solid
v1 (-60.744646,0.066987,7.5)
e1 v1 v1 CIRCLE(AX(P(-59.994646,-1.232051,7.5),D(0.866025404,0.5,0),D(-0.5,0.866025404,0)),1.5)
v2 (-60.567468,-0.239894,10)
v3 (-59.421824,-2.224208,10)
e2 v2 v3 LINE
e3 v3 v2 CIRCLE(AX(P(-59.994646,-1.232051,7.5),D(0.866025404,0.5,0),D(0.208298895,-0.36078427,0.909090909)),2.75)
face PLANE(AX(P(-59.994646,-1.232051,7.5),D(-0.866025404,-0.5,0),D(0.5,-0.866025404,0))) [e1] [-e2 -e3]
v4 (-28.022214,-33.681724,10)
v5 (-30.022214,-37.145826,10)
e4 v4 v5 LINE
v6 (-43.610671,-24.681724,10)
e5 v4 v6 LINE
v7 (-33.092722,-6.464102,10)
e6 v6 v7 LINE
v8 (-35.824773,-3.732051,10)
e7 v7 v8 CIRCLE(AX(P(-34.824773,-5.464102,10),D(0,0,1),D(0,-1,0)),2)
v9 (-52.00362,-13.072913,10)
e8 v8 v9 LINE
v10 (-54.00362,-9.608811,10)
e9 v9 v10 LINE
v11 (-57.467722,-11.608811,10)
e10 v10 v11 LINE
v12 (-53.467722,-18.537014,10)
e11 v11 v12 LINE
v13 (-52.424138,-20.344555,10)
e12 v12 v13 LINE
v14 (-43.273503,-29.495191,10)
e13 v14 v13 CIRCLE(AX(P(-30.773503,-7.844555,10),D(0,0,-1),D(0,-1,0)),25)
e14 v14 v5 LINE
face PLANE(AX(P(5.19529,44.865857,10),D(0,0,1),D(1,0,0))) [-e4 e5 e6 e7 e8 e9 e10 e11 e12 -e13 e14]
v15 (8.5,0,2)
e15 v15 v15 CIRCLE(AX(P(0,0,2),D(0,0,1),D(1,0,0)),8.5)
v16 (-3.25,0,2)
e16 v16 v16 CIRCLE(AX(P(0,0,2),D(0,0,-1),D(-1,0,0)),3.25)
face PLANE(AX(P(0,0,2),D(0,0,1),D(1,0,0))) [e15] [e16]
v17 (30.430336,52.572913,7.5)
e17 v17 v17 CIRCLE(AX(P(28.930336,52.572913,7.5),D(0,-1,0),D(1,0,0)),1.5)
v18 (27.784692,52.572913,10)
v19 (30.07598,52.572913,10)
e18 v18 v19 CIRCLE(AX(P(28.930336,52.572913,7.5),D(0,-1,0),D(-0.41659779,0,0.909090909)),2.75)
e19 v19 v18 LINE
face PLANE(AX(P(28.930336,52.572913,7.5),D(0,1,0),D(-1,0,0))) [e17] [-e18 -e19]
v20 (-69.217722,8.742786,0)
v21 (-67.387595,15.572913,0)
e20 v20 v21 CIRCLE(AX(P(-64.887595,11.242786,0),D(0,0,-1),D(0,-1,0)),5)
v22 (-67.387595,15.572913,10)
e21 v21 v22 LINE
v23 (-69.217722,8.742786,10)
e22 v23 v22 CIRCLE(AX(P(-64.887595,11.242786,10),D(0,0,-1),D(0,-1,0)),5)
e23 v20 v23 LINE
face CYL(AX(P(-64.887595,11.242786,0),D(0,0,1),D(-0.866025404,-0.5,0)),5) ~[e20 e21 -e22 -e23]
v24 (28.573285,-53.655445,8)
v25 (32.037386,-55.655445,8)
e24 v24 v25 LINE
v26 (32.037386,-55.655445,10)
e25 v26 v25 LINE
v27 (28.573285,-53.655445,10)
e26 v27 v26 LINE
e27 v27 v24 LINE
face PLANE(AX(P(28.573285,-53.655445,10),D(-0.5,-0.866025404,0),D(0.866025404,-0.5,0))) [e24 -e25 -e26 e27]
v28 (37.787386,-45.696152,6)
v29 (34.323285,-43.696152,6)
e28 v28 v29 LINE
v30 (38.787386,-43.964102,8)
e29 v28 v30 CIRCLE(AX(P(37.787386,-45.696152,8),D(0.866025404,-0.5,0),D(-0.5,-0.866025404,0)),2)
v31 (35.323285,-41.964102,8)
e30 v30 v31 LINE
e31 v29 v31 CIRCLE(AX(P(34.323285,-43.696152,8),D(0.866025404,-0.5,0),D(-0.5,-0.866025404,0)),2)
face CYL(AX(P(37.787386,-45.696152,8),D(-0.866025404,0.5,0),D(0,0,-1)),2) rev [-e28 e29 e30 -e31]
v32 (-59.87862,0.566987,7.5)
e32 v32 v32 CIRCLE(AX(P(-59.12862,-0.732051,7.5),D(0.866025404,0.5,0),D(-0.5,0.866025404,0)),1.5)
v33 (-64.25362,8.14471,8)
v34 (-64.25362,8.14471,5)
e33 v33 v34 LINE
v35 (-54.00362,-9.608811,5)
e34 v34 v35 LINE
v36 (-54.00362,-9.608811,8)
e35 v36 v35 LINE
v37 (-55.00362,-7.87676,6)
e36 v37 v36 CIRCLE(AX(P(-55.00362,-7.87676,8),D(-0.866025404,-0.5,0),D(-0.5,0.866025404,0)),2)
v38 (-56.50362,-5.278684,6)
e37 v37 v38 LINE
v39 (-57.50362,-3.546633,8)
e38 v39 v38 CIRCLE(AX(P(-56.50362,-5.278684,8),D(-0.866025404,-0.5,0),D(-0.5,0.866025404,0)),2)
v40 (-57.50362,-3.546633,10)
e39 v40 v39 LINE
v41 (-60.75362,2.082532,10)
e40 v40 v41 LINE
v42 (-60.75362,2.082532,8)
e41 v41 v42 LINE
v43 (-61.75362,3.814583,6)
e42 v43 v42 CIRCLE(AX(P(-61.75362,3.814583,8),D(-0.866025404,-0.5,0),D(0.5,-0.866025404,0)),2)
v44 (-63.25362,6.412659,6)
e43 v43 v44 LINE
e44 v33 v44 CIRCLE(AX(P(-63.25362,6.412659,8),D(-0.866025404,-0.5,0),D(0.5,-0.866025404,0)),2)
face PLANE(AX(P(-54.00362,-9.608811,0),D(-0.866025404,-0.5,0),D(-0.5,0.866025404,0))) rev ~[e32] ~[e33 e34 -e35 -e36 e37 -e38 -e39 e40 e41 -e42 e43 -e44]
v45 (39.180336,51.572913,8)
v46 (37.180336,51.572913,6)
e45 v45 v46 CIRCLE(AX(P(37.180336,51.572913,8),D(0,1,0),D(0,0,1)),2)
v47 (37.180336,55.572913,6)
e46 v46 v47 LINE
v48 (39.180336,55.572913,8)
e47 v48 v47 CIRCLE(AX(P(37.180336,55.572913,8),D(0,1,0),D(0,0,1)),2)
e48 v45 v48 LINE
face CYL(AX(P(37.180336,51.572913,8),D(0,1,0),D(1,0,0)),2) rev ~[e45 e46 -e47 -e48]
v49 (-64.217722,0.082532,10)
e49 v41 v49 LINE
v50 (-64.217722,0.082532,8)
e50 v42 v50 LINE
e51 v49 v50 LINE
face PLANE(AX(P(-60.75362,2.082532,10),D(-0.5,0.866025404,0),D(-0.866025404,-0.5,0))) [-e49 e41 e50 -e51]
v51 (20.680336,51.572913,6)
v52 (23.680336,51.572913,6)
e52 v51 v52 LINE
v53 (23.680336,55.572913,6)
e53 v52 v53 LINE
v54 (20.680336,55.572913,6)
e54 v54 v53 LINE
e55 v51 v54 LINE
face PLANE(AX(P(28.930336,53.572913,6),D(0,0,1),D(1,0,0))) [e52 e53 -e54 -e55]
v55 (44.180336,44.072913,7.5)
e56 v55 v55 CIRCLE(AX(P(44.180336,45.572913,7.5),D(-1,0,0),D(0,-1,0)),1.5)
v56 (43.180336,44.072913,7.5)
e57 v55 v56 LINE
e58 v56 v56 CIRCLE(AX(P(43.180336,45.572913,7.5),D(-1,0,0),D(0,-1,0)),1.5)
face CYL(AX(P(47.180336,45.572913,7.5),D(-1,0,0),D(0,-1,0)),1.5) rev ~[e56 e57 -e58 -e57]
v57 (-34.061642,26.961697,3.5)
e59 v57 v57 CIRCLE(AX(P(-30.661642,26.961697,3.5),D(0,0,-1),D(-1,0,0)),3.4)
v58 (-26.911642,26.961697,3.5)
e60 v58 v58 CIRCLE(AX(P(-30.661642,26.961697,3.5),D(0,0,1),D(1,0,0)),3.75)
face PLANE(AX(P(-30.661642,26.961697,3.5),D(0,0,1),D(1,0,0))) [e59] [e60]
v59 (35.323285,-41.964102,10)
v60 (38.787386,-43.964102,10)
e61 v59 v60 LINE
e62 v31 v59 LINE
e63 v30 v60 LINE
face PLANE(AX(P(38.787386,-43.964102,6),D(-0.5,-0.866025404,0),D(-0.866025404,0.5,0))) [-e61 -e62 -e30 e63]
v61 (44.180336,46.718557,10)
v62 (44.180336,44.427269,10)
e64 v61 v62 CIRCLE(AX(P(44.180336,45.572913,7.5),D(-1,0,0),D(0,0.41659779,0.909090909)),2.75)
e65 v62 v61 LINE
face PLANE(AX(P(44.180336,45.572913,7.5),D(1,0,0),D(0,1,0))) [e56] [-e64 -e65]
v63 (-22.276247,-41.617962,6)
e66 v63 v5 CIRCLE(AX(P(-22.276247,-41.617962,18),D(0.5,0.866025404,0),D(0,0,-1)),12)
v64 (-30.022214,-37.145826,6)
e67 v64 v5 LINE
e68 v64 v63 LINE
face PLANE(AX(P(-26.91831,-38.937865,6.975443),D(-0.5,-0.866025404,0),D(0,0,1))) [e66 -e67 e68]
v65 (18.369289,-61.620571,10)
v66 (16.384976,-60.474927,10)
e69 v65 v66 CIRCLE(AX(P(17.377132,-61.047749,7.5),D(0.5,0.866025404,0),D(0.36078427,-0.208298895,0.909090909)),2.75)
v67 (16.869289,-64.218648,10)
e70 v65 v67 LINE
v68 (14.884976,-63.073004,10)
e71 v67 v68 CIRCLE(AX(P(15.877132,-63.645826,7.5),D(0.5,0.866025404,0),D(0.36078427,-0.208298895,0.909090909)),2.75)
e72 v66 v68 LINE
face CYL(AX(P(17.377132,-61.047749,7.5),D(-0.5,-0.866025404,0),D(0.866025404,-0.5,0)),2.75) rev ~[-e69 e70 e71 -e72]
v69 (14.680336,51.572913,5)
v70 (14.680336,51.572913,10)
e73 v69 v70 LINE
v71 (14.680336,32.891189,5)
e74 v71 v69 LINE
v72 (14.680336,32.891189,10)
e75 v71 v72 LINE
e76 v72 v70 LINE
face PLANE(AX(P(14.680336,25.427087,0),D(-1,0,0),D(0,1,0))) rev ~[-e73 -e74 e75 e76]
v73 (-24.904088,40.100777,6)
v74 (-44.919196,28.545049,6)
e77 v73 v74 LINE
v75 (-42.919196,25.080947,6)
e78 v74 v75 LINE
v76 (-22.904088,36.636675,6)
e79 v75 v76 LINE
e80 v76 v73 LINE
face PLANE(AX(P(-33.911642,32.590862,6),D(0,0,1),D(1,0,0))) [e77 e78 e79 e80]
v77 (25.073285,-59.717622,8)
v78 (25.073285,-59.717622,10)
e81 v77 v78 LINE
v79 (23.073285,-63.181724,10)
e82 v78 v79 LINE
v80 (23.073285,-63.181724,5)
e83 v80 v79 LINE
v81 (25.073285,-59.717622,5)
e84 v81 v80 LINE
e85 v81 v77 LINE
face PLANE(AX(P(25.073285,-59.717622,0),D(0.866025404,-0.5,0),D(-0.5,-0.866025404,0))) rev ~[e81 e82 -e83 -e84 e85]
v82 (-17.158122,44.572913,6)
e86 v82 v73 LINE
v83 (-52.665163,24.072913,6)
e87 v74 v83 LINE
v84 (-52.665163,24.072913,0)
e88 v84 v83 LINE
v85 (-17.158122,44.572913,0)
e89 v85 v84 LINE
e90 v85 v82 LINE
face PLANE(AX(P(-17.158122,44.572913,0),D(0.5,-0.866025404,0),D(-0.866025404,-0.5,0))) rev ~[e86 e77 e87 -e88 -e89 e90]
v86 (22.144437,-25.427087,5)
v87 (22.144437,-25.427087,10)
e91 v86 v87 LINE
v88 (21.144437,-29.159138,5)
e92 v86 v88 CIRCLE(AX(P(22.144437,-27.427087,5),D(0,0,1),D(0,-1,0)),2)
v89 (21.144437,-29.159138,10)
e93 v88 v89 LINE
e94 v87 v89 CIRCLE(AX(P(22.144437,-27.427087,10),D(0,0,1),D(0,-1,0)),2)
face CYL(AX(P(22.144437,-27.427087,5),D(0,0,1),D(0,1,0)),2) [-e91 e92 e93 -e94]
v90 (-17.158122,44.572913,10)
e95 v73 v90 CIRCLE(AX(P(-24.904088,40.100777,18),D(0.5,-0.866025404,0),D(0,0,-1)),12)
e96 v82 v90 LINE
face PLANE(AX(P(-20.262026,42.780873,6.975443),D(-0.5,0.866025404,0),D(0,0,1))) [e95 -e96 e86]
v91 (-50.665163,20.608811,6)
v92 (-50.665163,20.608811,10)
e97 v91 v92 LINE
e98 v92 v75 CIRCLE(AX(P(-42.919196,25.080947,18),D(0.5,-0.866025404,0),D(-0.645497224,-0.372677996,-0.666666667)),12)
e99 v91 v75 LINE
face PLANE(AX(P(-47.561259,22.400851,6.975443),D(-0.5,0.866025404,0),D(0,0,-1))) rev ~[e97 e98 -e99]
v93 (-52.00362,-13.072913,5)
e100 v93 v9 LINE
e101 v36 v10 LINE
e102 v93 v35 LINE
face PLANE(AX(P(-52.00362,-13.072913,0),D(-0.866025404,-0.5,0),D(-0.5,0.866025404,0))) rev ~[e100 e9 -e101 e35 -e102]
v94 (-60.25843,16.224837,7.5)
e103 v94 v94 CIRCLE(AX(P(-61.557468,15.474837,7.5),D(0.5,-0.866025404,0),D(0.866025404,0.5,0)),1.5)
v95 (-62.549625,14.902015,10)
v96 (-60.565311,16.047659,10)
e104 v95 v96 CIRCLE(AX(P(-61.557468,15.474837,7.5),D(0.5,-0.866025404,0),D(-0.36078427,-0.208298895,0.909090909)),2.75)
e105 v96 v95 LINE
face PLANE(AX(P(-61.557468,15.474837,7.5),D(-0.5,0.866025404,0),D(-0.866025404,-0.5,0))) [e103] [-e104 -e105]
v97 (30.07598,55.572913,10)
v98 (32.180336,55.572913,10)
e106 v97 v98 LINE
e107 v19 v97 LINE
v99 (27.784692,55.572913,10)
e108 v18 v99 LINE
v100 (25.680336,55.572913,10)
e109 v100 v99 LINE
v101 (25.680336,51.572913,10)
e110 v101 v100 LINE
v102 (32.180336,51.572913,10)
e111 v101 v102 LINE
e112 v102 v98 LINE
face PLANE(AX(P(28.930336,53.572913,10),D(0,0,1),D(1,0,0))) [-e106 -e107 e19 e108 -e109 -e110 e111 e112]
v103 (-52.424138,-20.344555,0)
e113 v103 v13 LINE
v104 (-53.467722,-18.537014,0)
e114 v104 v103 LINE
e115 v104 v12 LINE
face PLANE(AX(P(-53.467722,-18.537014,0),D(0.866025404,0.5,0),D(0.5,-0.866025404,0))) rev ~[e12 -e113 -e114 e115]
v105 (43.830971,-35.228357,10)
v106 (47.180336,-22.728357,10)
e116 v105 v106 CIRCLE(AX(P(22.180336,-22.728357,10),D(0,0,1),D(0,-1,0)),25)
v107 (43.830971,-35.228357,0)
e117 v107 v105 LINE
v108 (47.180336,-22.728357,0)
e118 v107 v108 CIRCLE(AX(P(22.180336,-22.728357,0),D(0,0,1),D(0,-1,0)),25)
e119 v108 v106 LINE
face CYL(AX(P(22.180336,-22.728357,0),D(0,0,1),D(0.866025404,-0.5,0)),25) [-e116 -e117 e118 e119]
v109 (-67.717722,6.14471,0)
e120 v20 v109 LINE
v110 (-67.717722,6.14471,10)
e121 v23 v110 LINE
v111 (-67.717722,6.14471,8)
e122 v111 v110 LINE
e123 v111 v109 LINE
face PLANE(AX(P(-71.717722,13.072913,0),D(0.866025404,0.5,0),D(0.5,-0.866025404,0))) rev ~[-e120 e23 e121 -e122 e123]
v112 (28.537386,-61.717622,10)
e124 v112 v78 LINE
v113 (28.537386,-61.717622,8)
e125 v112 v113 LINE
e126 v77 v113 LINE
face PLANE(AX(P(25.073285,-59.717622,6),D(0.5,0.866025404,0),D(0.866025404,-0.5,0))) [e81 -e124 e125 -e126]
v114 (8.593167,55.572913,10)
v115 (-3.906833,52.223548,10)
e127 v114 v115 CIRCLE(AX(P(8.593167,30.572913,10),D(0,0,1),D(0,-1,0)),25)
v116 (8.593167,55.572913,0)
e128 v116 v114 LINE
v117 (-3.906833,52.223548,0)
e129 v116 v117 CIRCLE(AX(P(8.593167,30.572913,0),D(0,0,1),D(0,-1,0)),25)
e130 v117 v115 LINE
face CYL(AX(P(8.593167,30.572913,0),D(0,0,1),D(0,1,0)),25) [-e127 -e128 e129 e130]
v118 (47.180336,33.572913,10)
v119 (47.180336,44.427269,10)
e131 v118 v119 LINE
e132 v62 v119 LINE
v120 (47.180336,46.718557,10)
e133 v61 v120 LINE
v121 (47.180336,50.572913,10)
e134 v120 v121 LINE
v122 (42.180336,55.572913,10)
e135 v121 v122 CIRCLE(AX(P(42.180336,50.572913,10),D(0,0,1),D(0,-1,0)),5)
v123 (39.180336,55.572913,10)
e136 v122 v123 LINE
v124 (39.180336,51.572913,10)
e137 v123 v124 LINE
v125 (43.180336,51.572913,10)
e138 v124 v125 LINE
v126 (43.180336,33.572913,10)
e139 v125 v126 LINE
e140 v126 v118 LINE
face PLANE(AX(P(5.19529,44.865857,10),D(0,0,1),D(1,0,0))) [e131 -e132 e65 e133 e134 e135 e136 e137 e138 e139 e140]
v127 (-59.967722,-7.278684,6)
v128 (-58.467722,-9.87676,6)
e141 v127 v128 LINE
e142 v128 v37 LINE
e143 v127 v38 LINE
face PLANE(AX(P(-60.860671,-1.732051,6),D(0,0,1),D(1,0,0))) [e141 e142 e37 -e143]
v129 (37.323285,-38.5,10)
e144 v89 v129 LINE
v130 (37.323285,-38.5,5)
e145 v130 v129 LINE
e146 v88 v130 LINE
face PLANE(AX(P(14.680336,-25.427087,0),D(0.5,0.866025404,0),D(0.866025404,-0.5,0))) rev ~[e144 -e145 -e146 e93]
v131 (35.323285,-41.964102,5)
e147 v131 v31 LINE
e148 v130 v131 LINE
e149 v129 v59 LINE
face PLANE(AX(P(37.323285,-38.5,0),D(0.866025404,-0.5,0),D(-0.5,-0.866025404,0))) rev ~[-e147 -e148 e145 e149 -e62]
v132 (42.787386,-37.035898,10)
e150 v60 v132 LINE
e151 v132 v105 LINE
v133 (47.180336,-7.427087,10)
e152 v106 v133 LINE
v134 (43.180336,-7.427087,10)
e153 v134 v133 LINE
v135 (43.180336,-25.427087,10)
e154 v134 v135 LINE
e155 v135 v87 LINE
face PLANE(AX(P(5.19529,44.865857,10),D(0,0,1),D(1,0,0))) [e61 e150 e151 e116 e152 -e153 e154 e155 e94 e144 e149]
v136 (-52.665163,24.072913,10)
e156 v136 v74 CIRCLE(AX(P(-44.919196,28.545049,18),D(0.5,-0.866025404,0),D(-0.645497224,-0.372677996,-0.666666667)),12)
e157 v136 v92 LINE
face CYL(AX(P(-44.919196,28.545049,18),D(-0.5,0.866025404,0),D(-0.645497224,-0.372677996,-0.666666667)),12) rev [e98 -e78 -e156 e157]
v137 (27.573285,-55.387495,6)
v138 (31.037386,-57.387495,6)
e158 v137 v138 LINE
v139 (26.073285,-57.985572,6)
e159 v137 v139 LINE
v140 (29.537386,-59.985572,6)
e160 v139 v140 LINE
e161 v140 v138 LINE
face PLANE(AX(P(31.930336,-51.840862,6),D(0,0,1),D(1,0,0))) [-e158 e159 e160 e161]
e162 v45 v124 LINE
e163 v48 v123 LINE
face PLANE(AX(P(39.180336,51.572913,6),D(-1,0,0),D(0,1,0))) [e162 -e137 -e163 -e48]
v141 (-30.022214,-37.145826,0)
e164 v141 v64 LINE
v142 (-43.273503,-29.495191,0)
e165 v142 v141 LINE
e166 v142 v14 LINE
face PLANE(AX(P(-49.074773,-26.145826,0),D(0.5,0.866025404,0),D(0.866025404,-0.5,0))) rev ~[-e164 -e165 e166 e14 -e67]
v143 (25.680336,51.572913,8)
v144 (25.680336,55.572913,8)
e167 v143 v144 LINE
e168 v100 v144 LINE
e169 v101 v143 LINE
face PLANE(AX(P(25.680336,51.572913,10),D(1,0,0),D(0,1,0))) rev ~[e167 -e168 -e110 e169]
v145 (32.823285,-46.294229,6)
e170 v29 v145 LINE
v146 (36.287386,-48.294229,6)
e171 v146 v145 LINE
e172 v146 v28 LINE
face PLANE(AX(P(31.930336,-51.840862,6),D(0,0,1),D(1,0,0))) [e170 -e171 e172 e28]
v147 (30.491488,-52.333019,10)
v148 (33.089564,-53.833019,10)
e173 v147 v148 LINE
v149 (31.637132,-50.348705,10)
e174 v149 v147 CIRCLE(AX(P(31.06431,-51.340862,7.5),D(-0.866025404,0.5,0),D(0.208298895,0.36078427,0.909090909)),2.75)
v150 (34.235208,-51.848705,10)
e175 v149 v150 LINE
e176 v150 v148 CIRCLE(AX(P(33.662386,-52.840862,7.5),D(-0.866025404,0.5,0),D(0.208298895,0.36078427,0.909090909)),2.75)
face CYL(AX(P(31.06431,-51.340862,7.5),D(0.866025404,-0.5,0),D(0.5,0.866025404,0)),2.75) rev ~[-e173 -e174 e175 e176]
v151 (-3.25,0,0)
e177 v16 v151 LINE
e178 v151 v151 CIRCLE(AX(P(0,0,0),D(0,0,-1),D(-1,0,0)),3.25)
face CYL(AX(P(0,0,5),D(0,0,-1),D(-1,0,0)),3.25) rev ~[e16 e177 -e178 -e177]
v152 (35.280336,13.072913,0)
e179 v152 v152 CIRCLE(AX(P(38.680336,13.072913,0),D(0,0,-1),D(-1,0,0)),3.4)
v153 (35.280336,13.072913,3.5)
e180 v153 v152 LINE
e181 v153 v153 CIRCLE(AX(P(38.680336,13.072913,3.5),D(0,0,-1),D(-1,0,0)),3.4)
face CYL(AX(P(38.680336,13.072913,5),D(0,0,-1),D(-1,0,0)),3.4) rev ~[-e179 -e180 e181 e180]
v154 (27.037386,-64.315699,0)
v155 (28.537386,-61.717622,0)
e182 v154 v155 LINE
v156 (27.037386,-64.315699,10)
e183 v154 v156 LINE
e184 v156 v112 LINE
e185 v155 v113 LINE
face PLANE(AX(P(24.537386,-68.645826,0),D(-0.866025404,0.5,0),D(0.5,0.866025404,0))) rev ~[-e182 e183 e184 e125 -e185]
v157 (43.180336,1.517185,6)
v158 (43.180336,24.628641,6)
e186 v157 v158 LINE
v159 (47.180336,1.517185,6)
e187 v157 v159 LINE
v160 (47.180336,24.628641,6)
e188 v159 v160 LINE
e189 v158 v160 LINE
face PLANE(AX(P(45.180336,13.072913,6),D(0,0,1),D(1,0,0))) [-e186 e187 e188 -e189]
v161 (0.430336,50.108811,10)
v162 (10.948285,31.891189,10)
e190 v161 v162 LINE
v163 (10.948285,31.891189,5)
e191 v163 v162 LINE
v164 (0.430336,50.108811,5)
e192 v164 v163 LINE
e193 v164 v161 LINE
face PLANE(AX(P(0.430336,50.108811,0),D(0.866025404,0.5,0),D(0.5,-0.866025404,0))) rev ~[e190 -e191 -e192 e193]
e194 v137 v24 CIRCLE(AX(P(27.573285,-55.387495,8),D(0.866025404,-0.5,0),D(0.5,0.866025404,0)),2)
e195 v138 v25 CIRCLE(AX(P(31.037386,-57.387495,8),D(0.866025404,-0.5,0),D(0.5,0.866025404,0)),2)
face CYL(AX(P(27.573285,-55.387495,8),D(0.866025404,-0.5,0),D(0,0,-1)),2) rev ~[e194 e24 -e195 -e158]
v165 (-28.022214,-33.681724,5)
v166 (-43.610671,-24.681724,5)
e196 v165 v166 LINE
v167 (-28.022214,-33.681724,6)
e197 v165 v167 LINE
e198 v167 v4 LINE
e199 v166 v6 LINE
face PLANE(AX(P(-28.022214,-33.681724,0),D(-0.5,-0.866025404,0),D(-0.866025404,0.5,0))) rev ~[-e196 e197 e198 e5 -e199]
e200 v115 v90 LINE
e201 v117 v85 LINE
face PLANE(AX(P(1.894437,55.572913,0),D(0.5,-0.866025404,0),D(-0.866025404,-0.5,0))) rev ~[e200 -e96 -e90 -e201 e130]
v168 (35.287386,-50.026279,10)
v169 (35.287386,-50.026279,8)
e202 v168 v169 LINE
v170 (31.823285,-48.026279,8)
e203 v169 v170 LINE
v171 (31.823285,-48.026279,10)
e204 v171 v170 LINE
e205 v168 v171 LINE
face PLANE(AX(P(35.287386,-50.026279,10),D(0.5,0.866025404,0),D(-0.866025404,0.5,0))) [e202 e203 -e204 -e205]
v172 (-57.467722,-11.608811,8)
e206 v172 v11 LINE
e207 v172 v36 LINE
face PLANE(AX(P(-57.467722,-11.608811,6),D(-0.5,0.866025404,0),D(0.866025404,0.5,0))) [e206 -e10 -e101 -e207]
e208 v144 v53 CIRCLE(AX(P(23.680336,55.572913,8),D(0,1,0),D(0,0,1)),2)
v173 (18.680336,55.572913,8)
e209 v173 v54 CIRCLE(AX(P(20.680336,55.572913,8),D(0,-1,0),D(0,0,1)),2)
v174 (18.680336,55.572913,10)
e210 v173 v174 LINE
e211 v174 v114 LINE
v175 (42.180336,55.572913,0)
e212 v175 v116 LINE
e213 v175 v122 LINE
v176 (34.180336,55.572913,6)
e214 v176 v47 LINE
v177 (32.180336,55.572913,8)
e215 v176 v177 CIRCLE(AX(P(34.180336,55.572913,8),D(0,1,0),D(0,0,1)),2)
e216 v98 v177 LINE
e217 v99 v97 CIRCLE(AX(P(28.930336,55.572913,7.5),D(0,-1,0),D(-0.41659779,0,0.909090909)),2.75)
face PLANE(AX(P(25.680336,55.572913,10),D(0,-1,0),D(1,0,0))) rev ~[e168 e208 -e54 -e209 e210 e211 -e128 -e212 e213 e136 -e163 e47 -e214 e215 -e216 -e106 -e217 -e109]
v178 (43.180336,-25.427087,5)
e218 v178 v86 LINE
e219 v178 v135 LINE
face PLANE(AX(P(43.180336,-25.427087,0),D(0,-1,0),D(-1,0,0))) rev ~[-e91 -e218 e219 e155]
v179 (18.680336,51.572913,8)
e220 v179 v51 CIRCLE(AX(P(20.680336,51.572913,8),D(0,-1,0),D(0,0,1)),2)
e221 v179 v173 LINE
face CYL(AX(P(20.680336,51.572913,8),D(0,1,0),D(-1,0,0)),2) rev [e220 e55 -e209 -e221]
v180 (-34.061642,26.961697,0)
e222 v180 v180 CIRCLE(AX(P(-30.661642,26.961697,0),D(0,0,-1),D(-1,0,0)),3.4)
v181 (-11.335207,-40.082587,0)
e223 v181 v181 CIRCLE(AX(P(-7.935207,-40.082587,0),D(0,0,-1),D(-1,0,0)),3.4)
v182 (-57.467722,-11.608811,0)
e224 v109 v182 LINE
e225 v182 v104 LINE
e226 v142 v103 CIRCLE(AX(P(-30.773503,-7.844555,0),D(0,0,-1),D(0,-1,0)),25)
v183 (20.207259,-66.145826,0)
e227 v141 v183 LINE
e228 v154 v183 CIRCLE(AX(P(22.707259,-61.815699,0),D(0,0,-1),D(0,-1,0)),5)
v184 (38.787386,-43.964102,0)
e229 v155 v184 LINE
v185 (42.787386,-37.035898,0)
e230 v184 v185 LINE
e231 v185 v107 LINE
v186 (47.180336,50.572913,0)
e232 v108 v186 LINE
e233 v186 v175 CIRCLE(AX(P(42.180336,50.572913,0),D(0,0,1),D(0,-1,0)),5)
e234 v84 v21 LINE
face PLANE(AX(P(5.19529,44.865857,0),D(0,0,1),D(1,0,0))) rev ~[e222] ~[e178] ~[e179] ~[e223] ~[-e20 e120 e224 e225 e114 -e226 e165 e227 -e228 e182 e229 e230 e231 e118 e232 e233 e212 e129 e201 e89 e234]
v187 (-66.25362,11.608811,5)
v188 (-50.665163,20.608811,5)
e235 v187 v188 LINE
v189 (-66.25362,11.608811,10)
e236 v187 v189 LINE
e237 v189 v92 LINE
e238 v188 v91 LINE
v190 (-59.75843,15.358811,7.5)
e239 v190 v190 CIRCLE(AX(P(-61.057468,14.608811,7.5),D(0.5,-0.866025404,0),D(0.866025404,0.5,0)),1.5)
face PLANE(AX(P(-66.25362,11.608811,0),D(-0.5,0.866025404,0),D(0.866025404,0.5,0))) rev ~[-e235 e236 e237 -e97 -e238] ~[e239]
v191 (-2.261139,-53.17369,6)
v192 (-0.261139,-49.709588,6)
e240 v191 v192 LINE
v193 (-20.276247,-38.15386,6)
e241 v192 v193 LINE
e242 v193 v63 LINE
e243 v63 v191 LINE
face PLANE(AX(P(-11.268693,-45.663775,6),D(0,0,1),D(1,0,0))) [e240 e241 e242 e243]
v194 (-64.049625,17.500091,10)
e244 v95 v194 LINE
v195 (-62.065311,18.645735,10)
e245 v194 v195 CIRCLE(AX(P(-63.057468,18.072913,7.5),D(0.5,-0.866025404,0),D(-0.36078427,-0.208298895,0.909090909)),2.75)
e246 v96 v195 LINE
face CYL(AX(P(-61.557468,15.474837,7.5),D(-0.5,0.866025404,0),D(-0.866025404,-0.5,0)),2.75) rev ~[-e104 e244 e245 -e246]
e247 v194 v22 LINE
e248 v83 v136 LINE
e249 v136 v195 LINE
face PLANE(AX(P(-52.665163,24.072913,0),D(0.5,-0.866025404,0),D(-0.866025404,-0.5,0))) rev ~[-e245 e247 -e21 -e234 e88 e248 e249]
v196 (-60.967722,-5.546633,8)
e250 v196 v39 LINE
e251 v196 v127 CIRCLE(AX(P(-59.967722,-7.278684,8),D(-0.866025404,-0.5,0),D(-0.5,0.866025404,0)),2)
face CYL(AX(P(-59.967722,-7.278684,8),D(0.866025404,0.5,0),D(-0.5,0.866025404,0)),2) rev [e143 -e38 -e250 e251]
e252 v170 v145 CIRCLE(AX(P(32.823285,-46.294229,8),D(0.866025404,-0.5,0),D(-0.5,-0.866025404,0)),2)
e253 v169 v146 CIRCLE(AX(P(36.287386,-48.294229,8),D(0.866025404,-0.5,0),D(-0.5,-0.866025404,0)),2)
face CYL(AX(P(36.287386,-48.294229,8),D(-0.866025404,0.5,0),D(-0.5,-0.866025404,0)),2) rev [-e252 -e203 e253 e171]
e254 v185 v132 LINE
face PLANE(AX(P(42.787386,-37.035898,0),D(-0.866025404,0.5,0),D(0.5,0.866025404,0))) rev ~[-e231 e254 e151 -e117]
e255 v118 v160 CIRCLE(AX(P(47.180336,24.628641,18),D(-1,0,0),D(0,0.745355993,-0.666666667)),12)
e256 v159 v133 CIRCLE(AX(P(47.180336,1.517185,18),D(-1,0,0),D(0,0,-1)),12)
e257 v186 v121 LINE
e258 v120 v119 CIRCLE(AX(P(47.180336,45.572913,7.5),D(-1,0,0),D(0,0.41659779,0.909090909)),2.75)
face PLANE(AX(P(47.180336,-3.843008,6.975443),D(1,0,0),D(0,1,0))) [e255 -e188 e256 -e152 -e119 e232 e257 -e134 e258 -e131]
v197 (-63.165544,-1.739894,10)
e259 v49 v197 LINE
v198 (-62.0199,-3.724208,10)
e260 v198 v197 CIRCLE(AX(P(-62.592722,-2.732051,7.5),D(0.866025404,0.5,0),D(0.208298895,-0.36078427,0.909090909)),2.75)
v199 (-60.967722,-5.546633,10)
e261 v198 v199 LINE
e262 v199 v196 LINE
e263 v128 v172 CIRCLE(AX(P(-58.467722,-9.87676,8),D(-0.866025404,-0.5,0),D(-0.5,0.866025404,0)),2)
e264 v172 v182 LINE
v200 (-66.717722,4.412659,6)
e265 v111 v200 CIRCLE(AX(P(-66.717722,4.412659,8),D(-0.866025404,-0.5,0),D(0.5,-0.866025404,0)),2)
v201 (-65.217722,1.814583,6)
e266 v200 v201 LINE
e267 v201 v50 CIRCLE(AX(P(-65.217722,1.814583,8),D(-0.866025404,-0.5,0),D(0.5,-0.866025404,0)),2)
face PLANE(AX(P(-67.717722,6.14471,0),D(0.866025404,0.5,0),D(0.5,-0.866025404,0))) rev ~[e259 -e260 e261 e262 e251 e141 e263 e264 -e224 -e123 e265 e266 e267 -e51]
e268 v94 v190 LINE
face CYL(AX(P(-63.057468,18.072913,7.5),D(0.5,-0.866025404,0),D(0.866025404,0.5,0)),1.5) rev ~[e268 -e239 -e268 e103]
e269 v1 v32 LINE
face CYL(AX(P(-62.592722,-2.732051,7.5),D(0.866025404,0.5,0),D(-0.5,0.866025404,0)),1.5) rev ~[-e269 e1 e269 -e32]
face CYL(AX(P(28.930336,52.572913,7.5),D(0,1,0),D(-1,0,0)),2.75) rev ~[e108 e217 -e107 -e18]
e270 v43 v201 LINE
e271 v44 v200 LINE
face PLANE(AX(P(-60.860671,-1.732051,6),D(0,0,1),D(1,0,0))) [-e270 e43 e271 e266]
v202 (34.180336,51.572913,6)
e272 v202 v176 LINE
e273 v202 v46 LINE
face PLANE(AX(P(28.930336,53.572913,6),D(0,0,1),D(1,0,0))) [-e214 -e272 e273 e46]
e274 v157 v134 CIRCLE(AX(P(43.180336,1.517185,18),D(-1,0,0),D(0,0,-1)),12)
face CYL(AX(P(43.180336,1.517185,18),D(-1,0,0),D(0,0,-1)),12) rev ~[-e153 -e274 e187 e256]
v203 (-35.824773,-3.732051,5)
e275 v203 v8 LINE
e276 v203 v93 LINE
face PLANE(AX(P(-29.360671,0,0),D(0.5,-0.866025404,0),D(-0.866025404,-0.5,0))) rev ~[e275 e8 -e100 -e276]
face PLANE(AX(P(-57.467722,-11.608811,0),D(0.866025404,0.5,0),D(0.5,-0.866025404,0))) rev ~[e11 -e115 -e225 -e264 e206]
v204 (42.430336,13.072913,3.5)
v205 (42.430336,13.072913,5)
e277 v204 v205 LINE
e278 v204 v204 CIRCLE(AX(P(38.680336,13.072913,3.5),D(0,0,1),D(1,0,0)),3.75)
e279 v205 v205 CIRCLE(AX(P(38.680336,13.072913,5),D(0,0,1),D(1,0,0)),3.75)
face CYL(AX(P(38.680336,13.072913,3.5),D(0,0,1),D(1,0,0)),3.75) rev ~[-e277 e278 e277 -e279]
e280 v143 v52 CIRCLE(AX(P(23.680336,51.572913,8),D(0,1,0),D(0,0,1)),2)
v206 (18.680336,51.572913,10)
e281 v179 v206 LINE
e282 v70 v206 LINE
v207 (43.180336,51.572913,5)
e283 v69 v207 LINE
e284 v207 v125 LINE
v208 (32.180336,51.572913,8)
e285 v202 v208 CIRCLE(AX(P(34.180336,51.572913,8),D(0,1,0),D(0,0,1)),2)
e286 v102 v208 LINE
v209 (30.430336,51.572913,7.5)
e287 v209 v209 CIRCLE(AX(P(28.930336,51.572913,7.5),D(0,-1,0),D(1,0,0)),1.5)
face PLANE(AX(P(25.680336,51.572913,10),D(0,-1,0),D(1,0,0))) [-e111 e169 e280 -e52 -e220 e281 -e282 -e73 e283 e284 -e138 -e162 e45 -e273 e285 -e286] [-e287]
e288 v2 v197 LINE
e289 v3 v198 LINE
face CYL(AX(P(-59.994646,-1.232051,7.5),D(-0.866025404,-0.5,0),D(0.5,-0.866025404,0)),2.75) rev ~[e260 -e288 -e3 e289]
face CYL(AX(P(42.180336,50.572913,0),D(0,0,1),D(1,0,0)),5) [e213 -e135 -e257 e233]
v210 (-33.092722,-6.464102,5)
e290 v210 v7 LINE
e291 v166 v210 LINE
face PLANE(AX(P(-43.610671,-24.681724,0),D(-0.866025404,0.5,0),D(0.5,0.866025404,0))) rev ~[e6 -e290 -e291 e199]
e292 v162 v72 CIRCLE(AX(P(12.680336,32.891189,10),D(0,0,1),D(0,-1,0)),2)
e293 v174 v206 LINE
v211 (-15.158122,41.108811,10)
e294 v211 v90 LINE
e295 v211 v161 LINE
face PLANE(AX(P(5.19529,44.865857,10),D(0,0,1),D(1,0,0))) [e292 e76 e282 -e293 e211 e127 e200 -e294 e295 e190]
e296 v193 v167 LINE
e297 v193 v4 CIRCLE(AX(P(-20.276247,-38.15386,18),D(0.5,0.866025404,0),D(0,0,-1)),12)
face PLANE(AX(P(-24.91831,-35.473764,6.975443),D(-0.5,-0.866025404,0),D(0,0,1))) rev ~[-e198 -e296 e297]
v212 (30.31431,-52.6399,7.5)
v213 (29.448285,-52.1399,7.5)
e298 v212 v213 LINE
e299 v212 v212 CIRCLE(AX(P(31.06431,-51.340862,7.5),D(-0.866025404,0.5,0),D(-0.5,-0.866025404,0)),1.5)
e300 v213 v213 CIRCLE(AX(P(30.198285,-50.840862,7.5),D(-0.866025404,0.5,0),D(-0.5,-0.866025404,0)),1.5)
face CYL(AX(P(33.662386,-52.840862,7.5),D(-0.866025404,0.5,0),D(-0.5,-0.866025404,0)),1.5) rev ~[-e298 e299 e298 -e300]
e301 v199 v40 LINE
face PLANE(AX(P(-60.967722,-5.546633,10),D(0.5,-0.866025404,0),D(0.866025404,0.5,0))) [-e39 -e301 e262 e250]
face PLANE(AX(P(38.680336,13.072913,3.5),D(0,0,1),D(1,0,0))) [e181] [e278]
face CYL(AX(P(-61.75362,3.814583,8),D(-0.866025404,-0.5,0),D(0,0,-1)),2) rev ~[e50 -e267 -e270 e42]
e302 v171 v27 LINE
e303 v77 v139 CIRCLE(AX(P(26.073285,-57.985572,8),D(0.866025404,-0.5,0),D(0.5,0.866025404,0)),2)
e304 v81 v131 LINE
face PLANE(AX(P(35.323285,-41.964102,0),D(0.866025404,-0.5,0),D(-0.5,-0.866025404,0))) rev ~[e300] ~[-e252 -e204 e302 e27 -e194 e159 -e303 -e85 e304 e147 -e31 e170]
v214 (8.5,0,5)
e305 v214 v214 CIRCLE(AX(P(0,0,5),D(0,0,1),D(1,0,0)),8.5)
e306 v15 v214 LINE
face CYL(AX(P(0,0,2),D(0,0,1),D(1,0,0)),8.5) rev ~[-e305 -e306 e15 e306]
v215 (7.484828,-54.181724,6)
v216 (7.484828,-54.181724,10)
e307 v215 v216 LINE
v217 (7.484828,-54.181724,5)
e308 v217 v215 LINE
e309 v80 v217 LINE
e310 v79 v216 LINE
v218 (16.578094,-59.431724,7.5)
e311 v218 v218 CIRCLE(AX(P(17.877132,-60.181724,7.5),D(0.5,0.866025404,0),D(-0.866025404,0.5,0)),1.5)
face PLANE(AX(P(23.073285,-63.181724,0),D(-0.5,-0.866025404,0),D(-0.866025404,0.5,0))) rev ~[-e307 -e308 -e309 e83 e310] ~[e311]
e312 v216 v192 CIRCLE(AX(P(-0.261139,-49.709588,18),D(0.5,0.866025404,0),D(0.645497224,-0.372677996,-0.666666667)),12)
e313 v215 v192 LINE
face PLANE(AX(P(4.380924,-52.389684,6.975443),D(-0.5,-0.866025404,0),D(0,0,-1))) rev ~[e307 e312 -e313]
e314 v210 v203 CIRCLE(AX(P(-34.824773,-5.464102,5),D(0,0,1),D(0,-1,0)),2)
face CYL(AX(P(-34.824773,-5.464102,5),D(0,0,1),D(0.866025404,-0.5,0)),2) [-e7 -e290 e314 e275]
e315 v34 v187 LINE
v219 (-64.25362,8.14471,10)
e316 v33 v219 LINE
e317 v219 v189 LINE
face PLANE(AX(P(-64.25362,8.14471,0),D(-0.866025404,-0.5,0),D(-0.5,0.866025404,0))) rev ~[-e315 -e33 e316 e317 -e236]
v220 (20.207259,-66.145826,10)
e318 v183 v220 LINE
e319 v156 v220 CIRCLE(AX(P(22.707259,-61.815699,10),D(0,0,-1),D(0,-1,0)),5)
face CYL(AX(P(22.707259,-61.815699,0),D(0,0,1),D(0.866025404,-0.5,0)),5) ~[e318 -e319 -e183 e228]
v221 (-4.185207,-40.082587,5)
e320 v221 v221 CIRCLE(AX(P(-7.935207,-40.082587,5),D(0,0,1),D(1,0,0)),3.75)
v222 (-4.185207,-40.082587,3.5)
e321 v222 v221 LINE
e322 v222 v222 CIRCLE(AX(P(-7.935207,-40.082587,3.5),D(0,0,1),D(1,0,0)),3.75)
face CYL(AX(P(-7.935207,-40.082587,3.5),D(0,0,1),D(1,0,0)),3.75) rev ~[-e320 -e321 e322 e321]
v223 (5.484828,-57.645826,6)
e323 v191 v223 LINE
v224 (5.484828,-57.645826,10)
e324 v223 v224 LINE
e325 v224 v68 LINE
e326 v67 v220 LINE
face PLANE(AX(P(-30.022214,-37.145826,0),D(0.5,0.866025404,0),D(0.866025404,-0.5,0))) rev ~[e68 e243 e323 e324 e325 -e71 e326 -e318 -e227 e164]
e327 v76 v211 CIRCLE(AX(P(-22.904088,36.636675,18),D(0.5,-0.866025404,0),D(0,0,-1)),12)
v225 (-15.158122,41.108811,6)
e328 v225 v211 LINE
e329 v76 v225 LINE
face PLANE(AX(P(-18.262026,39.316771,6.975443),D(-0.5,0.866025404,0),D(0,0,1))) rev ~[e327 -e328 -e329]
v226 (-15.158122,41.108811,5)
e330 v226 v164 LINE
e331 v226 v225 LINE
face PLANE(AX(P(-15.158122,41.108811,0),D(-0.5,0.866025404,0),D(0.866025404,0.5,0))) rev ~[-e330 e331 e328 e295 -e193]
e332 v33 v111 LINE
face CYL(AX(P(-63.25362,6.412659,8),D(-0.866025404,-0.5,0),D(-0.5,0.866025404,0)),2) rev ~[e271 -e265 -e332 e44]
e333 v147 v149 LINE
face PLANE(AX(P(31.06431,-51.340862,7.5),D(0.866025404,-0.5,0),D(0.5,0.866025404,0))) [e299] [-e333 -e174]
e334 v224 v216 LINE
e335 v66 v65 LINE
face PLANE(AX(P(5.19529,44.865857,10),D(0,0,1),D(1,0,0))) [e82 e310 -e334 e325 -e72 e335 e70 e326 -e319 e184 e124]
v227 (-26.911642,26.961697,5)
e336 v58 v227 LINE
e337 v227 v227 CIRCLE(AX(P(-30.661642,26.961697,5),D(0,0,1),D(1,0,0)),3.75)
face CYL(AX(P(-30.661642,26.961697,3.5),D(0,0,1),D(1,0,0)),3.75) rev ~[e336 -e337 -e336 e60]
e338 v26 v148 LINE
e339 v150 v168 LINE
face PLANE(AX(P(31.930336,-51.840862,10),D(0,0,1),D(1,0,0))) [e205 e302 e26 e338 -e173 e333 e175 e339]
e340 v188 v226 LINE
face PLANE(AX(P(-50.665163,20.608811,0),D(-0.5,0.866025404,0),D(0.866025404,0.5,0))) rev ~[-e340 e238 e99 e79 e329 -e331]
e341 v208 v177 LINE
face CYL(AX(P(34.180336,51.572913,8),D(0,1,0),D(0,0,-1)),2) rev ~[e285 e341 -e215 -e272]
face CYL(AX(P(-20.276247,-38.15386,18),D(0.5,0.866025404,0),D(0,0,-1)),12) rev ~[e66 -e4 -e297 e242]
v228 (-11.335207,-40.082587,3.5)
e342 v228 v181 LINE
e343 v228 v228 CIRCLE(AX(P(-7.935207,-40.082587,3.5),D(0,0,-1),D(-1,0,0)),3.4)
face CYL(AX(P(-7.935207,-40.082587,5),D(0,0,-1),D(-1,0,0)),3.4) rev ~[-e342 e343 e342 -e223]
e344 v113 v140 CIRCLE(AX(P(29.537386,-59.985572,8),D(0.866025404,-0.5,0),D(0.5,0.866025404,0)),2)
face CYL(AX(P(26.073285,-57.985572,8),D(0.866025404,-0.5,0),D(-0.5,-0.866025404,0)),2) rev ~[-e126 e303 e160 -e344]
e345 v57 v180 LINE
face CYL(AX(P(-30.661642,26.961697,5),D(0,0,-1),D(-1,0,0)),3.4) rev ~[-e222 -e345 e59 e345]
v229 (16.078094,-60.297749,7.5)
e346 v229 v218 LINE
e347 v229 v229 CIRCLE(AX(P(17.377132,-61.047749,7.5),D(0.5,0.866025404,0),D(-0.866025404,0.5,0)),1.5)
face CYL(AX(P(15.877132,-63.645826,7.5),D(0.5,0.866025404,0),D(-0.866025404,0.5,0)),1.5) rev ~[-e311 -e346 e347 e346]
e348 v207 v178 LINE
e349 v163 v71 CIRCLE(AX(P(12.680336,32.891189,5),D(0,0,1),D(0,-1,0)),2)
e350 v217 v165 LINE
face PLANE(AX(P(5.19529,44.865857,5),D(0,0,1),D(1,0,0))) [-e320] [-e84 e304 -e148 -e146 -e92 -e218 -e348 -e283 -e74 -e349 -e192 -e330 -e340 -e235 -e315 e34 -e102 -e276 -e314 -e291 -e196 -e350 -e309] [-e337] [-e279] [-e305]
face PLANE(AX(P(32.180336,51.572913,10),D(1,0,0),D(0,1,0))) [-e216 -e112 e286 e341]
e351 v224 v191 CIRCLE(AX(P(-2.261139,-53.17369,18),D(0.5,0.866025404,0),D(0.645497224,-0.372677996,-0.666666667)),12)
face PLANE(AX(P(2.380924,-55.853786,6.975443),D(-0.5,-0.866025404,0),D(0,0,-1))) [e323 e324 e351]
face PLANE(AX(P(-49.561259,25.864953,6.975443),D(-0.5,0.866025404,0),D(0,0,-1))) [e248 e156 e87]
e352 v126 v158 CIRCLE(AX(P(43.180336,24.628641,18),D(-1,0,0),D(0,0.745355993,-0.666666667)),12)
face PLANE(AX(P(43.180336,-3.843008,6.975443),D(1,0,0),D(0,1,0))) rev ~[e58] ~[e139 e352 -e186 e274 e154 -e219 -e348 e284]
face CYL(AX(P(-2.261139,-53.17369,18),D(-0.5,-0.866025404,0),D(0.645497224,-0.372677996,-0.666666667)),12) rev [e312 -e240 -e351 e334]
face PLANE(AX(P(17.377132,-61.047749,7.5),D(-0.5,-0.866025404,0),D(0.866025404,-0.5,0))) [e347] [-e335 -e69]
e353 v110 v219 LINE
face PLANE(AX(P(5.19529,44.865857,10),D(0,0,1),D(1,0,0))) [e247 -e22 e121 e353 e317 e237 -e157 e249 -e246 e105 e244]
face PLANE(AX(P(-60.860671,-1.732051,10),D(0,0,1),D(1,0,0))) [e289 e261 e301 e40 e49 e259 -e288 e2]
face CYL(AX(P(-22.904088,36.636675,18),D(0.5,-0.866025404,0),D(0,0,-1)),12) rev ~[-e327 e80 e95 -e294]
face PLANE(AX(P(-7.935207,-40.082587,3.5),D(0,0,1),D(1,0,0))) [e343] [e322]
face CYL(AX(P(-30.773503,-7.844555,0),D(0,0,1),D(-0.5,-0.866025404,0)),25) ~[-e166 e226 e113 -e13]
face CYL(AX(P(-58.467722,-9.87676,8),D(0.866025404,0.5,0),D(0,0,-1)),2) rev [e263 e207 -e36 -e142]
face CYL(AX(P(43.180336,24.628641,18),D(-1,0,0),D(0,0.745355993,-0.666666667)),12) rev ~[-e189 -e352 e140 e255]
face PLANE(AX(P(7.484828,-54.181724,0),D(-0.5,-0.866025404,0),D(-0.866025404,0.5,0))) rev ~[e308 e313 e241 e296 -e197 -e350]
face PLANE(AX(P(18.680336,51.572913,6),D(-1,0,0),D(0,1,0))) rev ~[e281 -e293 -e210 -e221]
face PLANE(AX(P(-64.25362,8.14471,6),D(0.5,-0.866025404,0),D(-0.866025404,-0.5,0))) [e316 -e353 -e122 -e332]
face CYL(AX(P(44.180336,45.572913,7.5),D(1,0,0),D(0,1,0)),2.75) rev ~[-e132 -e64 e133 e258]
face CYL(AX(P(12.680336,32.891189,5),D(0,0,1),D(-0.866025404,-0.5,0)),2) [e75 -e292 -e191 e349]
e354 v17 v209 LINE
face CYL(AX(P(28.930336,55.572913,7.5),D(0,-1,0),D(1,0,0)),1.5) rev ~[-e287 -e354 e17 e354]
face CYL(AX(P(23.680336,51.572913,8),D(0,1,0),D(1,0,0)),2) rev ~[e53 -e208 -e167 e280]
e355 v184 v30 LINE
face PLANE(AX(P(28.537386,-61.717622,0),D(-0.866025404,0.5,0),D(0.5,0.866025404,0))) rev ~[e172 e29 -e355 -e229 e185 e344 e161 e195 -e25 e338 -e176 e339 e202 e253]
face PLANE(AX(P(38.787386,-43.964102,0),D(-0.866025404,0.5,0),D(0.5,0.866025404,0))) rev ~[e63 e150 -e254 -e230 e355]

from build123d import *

# Parameters (mm, degrees)
F0_W                   = 20.5
F0_H                   = 4
F0_W_2                 = 4
F0_H_2                 = 41
F1_DEPTH               = 10
F2_DEPTH               = 5
F4_D                   = 6.5
F4_CBORE_D             = 17
F4_CBORE_DEPTH         = 3
F5_START               = 6
F5_DEPTH               = 6
F6_R                   = 5
F7_R                   = 25
F11_START              = 6
F11_DEPTH              = 4
F12_T1_DEPTH           = 4
F12_T3_DEPTH           = 4
F12_T5_DEPTH           = 4
F12_T7_DEPTH           = 4
F12_T9_DEPTH           = 4
F13_W                  = 6.5
F13_H                  = 4
F14_DEPTH              = 6
F18_D                  = 3
F18_DEPTH              = 6
F18_CBORE_D            = 5.5
F18_CBORE_DEPTH        = 3
F18_TIP                = 0.9012909285
F18_ON_F8_D            = 3
F18_ON_F8_DEPTH        = 6
F18_ON_F8_CBORE_D      = 5.5
F18_ON_F8_CBORE_DEPTH  = 3
F18_ON_F8_TIP          = 0.9012909285
F18_ON_F10_D           = 3
F18_ON_F10_DEPTH       = 6
F18_ON_F10_CBORE_D     = 5.5
F18_ON_F10_CBORE_DEPTH = 3
F18_ON_F10_TIP         = 0.9012909285
F18_ON_F15_D           = 3
F18_ON_F15_DEPTH       = 6
F18_ON_F15_CBORE_D     = 5.5
F18_ON_F15_CBORE_DEPTH = 3
F18_ON_F15_TIP         = 0.9012909285
F18_ON_F16_D           = 3
F18_ON_F16_DEPTH       = 6
F18_ON_F16_CBORE_D     = 5.5
F18_ON_F16_CBORE_DEPTH = 3
F18_ON_F16_TIP         = 0.9012909285
F18_ON_F17_D           = 3
F18_ON_F17_DEPTH       = 6
F18_ON_F17_CBORE_D     = 5.5
F18_ON_F17_CBORE_DEPTH = 3
F18_ON_F17_TIP         = 0.9012909285
F19_R                  = 2
F21_D                  = 6.8
F21_DEPTH              = 6
F21_CBORE_D            = 7.5
F21_CBORE_DEPTH        = 1.5
F21_TIP                = 2.0429261047


# Not quite as in the source:
# - a fillet or chamfer that OpenCascade refuses, or shapes differently, is made with other operations: its cross-section is extruded or revolved along the edge and cut away or added


with BuildPart() as f1:
    # F0 (on Top) → F1 (new body)
    with BuildSketch(Plane.XY):
        Polygon((0.430335633, 50.1088111964), (14.680335633, 25.4270871885), (14.680335633, 51.5729128115), (18.680335633, 51.5729128115), (18.680335633, 55.5729128115), (10.680335633, 55.5729128115), (10.680335633, 40.3552904188), (1.8944372481, 55.5729128115), (-17.1581216351, 44.5729128115), (-15.1581216351, 41.1088111964), align=None)
        Polygon((43.180335633, -25.4270871885), (14.680335633, -25.4270871885), (37.3232848254, -38.5), (35.3232848254, -41.9641016151), (38.7873864406, -43.9641016151), (42.7873864406, -37.0358983849), (29.6085388633, -29.4270871885), (47.180335633, -29.4270871885), (47.180335633, -7.4270871885), (43.180335633, -7.4270871885), align=None)
        Polygon((-43.610671266, -24.6817240079), (-29.360671266, 0), (-52.0036204584, -13.0729128115), (-54.0036204584, -9.6088111964), (-57.4677220735, -11.6088111964), (-53.4677220735, -18.5370144266), (-40.2888744963, -10.9282032303), (-49.0747728811, -26.145825623), (-30.0222139979, -37.145825623), (-28.0222139979, -33.6817240079), align=None)
        Polygon((-50.6651631903, 20.6088111964), (-15.1581216351, 41.1088111964), (-17.1581216351, 44.5729128115), (-52.6651631903, 24.0729128115), align=None)
        with Locations((28.930335633, 53.5729128115)):
            Rectangle(F0_W, F0_H)
        with Locations((45.180335633, 13.0729128115)):
            Rectangle(F0_W_2, F0_H_2)
        Polygon((38.7873864406, -43.9641016151), (35.3232848254, -41.9641016151), (25.0732848254, -59.7176223927), (28.5373864406, -61.7176223927), align=None)
        Polygon((7.4848275573, -54.1817240079), (-28.0222139979, -33.6817240079), (-30.0222139979, -37.145825623), (5.4848275573, -57.645825623), align=None)
        Polygon((-57.4677220735, -11.6088111964), (-54.0036204584, -9.6088111964), (-64.2536204584, 8.1447095812), (-67.7177220735, 6.1447095812), align=None)
        Polygon((-66.2536204584, 11.6088111964), (-50.6651631903, 20.6088111964), (-52.6651631903, 24.0729128115), (-71.7177220735, 13.0729128115), (-67.7177220735, 6.1447095812), (-64.2536204584, 8.1447095812), align=None)
        Polygon((39.180335633, 55.5729128115), (39.180335633, 51.5729128115), (43.180335633, 51.5729128115), (43.180335633, 33.5729128115), (47.180335633, 33.5729128115), (47.180335633, 55.5729128115), align=None)
        Polygon((28.5373864406, -61.7176223927), (25.0732848254, -59.7176223927), (23.0732848254, -63.1817240079), (7.4848275573, -54.1817240079), (5.4848275573, -57.645825623), (24.5373864406, -68.645825623), align=None)
        Polygon((10.680335633, 55.5729128115), (1.8944372481, 55.5729128115), (10.680335633, 40.3552904188), align=None)
        Polygon((42.7873864406, -37.0358983849), (47.180335633, -29.4270871885), (29.6085388633, -29.4270871885), align=None)
        Polygon((-53.4677220735, -18.5370144266), (-49.0747728811, -26.145825623), (-40.2888744963, -10.9282032303), align=None)
    extrude(amount=F1_DEPTH)

    # F0 (on Top) → F2 (join)
    with BuildSketch(Plane.XY):
        Polygon((0.430335633, 50.1088111964), (14.680335633, 25.4270871885), (14.680335633, 51.5729128115), (18.680335633, 51.5729128115), (18.680335633, 55.5729128115), (10.680335633, 55.5729128115), (10.680335633, 40.3552904188), (1.8944372481, 55.5729128115), (-17.1581216351, 44.5729128115), (-15.1581216351, 41.1088111964), align=None)
        Polygon((43.180335633, -25.4270871885), (14.680335633, -25.4270871885), (37.3232848254, -38.5), (35.3232848254, -41.9641016151), (38.7873864406, -43.9641016151), (42.7873864406, -37.0358983849), (29.6085388633, -29.4270871885), (47.180335633, -29.4270871885), (47.180335633, -7.4270871885), (43.180335633, -7.4270871885), align=None)
        Polygon((-43.610671266, -24.6817240079), (-29.360671266, 0), (-52.0036204584, -13.0729128115), (-54.0036204584, -9.6088111964), (-57.4677220735, -11.6088111964), (-53.4677220735, -18.5370144266), (-40.2888744963, -10.9282032303), (-49.0747728811, -26.145825623), (-30.0222139979, -37.145825623), (-28.0222139979, -33.6817240079), align=None)
        Polygon((-50.6651631903, 20.6088111964), (-15.1581216351, 41.1088111964), (-17.1581216351, 44.5729128115), (-52.6651631903, 24.0729128115), align=None)
        with Locations((28.930335633, 53.5729128115)):
            Rectangle(F0_W, F0_H)
        with Locations((45.180335633, 13.0729128115)):
            Rectangle(F0_W_2, F0_H_2)
        Polygon((38.7873864406, -43.9641016151), (35.3232848254, -41.9641016151), (25.0732848254, -59.7176223927), (28.5373864406, -61.7176223927), align=None)
        Polygon((7.4848275573, -54.1817240079), (-28.0222139979, -33.6817240079), (-30.0222139979, -37.145825623), (5.4848275573, -57.645825623), align=None)
        Polygon((-57.4677220735, -11.6088111964), (-54.0036204584, -9.6088111964), (-64.2536204584, 8.1447095812), (-67.7177220735, 6.1447095812), align=None)
        Polygon((-66.2536204584, 11.6088111964), (-50.6651631903, 20.6088111964), (-52.6651631903, 24.0729128115), (-71.7177220735, 13.0729128115), (-67.7177220735, 6.1447095812), (-64.2536204584, 8.1447095812), align=None)
        Polygon((39.180335633, 55.5729128115), (39.180335633, 51.5729128115), (43.180335633, 51.5729128115), (43.180335633, 33.5729128115), (47.180335633, 33.5729128115), (47.180335633, 55.5729128115), align=None)
        Polygon((28.5373864406, -61.7176223927), (25.0732848254, -59.7176223927), (23.0732848254, -63.1817240079), (7.4848275573, -54.1817240079), (5.4848275573, -57.645825623), (24.5373864406, -68.645825623), align=None)
        Polygon((10.680335633, 55.5729128115), (1.8944372481, 55.5729128115), (10.680335633, 40.3552904188), align=None)
        Polygon((42.7873864406, -37.0358983849), (47.180335633, -29.4270871885), (29.6085388633, -29.4270871885), align=None)
        Polygon((-53.4677220735, -18.5370144266), (-49.0747728811, -26.145825623), (-40.2888744963, -10.9282032303), align=None)
        Polygon((-29.360671266, 0), (14.680335633, 25.4270871885), (0.430335633, 50.1088111964), (-15.1581216351, 41.1088111964), (-50.6651631903, 20.6088111964), (-66.2536204584, 11.6088111964), (-64.2536204584, 8.1447095812), (-54.0036204584, -9.6088111964), (-52.0036204584, -13.0729128115), align=None)
        Polygon((14.680335633, 51.5729128115), (14.680335633, 25.4270871885), (14.680335633, -25.4270871885), (43.180335633, -25.4270871885), (43.180335633, -7.4270871885), (43.180335633, 33.5729128115), (43.180335633, 51.5729128115), (39.180335633, 51.5729128115), (18.680335633, 51.5729128115), align=None)
        Polygon((14.680335633, -25.4270871885), (14.680335633, 25.4270871885), (-29.360671266, 0), align=None)
        Polygon((37.3232848254, -38.5), (14.680335633, -25.4270871885), (-29.360671266, 0), (-43.610671266, -24.6817240079), (-28.0222139979, -33.6817240079), (7.4848275573, -54.1817240079), (23.0732848254, -63.1817240079), (25.0732848254, -59.7176223927), (35.3232848254, -41.9641016151), align=None)
    extrude(amount=F2_DEPTH)

    # F4 (through all)
    with Locations(Plane.XY.offset(5)):
        with Locations((0, 0)):
            CounterBoreHole(F4_D / 2, F4_CBORE_D / 2, F4_CBORE_DEPTH)

    # F0 (on Top) → F5 (cut)
    with BuildSketch(Plane.XY.offset(F5_START)):
        with Locations((28.930335633, 53.5729128115)):
            Rectangle(F0_W, F0_H)
        Polygon((-57.4677220735, -11.6088111964), (-54.0036204584, -9.6088111964), (-64.2536204584, 8.1447095812), (-67.7177220735, 6.1447095812), align=None)
        Polygon((38.7873864406, -43.9641016151), (35.3232848254, -41.9641016151), (25.0732848254, -59.7176223927), (28.5373864406, -61.7176223927), align=None)
    extrude(amount=F5_DEPTH, mode=Mode.SUBTRACT)

    # F6
    f6_edges = [f1.edges().sort_by_distance(p)[0] for p in [
        (-71.717722, 13.072913, 5),
        (24.537386, -68.645826, 5),
        (47.180336, 55.572913, 5),
    ]]
    fillet(f6_edges, radius=F6_R)

    # F7
    f7_edges = [f1.edges().sort_by_distance(p)[0] for p in [
        (-49.074773, -26.145826, 5),
        (47.180336, -29.427087, 5),
        (1.894437, 55.572913, 5),
    ]]
    fillet(f7_edges, radius=F7_R)

    # F0 (on Top) → F11 (cut)
    with BuildSketch(Plane.XY.offset(F11_START)):
        Polygon((-50.6651631903, 20.6088111964), (-15.1581216351, 41.1088111964), (-17.1581216351, 44.5729128115), (-52.6651631903, 24.0729128115), align=None)
        with Locations((45.180335633, 13.0729128115)):
            Rectangle(F0_W_2, F0_H_2)
        Polygon((7.4848275573, -54.1817240079), (-28.0222139979, -33.6817240079), (-30.0222139979, -37.145825623), (5.4848275573, -57.645825623), align=None)
    extrude(amount=F11_DEPTH, mode=Mode.SUBTRACT)

    # F12: fillet of radius 12 on 6 edges, made by hand

    # F12_s2 → F12_t1 (join)
    with BuildSketch(Plane(origin=(-21.5901678165, 37.3952676021, 0), x_dir=(0, 0, 1), z_dir=(-0.5, 0.8660254038, 0))):
        with BuildLine():
            ThreePointArc((6, -1.5171847215), (7.0455488499, 3.3817947641), (10, 7.4270871885))
            Line((10, 7.4270871885), (6, 7.4270871885))
            Line((6, 7.4270871885), (6, -1.5171847215))
        make_face()
    extrude(amount=F12_T1_DEPTH)

    # F12_s4 → F12_t3 (join)
    with BuildSketch(Plane(origin=(-23.5901678165, 40.8593692172, 0), x_dir=(0, 0, 1), z_dir=(0.5, -0.8660254038, 0))):
        with BuildLine():
            ThreePointArc((10, 33.5729128115), (7.0455488499, 29.5276203871), (6, 24.6286409015))
            Line((6, 24.6286409015), (6, 33.5729128115))
            Line((6, 33.5729128115), (10, 33.5729128115))
        make_face()
    extrude(amount=F12_T3_DEPTH)

    # F12_s6 → F12_t5 (join)
    with BuildSketch(Plane(origin=(-21.5901678165, -37.3952676021, 0), x_dir=(0, 0, 1), z_dir=(-0.5, -0.8660254038, 0))):
        with BuildLine():
            ThreePointArc((6, -1.5171847215), (7.0455488499, 3.3817947641), (10, 7.4270871885))
            Line((10, 7.4270871885), (6, 7.4270871885))
            Line((6, 7.4270871885), (6, -1.5171847215))
        make_face()
    extrude(amount=F12_T5_DEPTH)

    # F12_s8 → F12_t7 (join)
    with BuildSketch(Plane(origin=(-23.5901678165, -40.8593692172, 0), x_dir=(0, 0, 1), z_dir=(0.5, 0.8660254038, 0))):
        with BuildLine():
            ThreePointArc((10, 33.5729128115), (7.0455488499, 29.5276203871), (6, 24.6286409015))
            Line((6, 24.6286409015), (6, 33.5729128115))
            Line((6, 33.5729128115), (10, 33.5729128115))
        make_face()
    extrude(amount=F12_T7_DEPTH)

    # F12_s10 → F12_t9 (join)
    with BuildSketch(Plane.YZ.offset(43.180335633)):
        with BuildLine():
            ThreePointArc((1.5171847215, 6), (-3.3817947641, 7.0455488499), (-7.4270871885, 10))
            Line((-7.4270871885, 10), (-7.4270871885, 6))
            Line((-7.4270871885, 6), (1.5171847215, 6))
        make_face()
        with BuildLine():
            ThreePointArc((33.5729128115, 10), (29.5276203871, 7.0455488499), (24.6286409015, 6))
            Line((24.6286409015, 6), (33.5729128115, 6))
            Line((33.5729128115, 6), (33.5729128115, 10))
        make_face()
    extrude(amount=F12_T9_DEPTH)

    # F13 (on face) → F14 (join)
    with BuildSketch(Plane.XY.offset(10)):
        with Locations((28.930335633, 53.5729128115)):
            Rectangle(F13_W, F13_H)
        Polygon((35.2873864406, -50.0262794416), (31.8232848254, -48.0262794416), (28.5732848254, -53.6554445662), (32.0373864406, -55.6554445662), align=None)
        Polygon((-60.7536204584, 2.0825317547), (-64.2177220735, 0.0825317547), (-60.9677220735, -5.5466333699), (-57.5036204584, -3.5466333699), align=None)
    extrude(amount=-F14_DEPTH)

    # F18
    with Locations(Plane(origin=(-23.5901678165, 40.8593692172, 0), x_dir=(-0.8660254038, -0.5, 0), z_dir=(-0.5, 0.8660254038, 0))):
        with Locations((45.5729128115, 7.5)):
            CounterBoreHole(F18_D / 2, F18_CBORE_D / 2, F18_CBORE_DEPTH, depth=F18_DEPTH)
            with Locations((0, 0, -(F18_DEPTH + F18_TIP / 2))):  # 118° drill point
                Cone(0, F18_D / 2, F18_TIP, mode=Mode.SUBTRACT)

    # F18 on F8
    with Locations(Plane(origin=(-23.5901678165, -40.8593692172, 0), x_dir=(0.8660254038, -0.5, 0), z_dir=(-0.5, -0.8660254038, 0))):
        with Locations((45.5729128115, 7.5)):
            CounterBoreHole(F18_ON_F8_D / 2, F18_ON_F8_CBORE_D / 2, F18_ON_F8_CBORE_DEPTH, depth=F18_ON_F8_DEPTH)
            with Locations((0, 0, -(F18_ON_F8_DEPTH + F18_ON_F8_TIP / 2))):  # 118° drill point
                Cone(0, F18_ON_F8_D / 2, F18_ON_F8_TIP, mode=Mode.SUBTRACT)

    # F18 on F10
    with Locations(Plane.YZ.offset(47.180335633)):
        with Locations((45.5729128115, 7.5)):
            CounterBoreHole(F18_ON_F10_D / 2, F18_ON_F10_CBORE_D / 2, F18_ON_F10_CBORE_DEPTH, depth=F18_ON_F10_DEPTH)
            with Locations((0, 0, -(F18_ON_F10_DEPTH + F18_ON_F10_TIP / 2))):  # 118° drill point
                Cone(0, F18_ON_F10_D / 2, F18_ON_F10_TIP, mode=Mode.SUBTRACT)

    # F18 on F15
    with Locations(Plane(origin=(48.1275542571, -27.7864564057, 0), x_dir=(0.5, 0.8660254038, 0), z_dir=(0.8660254038, -0.5, 0))):
        with Locations((-28.930335633, 7.5)):
            CounterBoreHole(F18_ON_F15_D / 2, F18_ON_F15_CBORE_D / 2, F18_ON_F15_CBORE_DEPTH, depth=F18_ON_F15_DEPTH)
            with Locations((0, 0, -(F18_ON_F15_DEPTH + F18_ON_F15_TIP / 2))):  # 118° drill point
                Cone(0, F18_ON_F15_D / 2, F18_ON_F15_TIP, mode=Mode.SUBTRACT)

    # F18 on F16
    with Locations(Plane(origin=(0, 55.5729128115, 0), x_dir=(-1, 0, 0), z_dir=(0, 1, 0))):
        with Locations((-28.930335633, 7.5)):
            CounterBoreHole(F18_ON_F16_D / 2, F18_ON_F16_CBORE_D / 2, F18_ON_F16_CBORE_DEPTH, depth=F18_ON_F16_DEPTH)
            with Locations((0, 0, -(F18_ON_F16_DEPTH + F18_ON_F16_TIP / 2))):  # 118° drill point
                Cone(0, F18_ON_F16_D / 2, F18_ON_F16_TIP, mode=Mode.SUBTRACT)

    # F18 on F17
    with Locations(Plane(origin=(-48.1275542571, -27.7864564057, 0), x_dir=(0.5, -0.8660254038, 0), z_dir=(-0.8660254038, -0.5, 0))):
        with Locations((-28.930335633, 7.5)):
            CounterBoreHole(F18_ON_F17_D / 2, F18_ON_F17_CBORE_D / 2, F18_ON_F17_CBORE_DEPTH, depth=F18_ON_F17_DEPTH)
            with Locations((0, 0, -(F18_ON_F17_DEPTH + F18_ON_F17_TIP / 2))):  # 118° drill point
                Cone(0, F18_ON_F17_D / 2, F18_ON_F17_TIP, mode=Mode.SUBTRACT)

    # F19
    f19_edges = [f1.edges().sort_by_distance(p)[0] for p in [
        (-29.360671, 0, 7.5),
        (14.680336, 25.427087, 7.5),
        (14.680336, -25.427087, 7.5),
        (39.180336, 53.572913, 6),
        (18.680336, 53.572913, 6),
        (-65.985671, 7.14471, 6),
        (-55.735671, -10.608811, 6),
        (26.805336, -60.717622, 6),
        (37.055336, -42.964102, 6),
        (-62.485671, 1.082532, 6),
        (-59.235671, -4.546633, 6),
        (30.305336, -54.655445, 6),
        (33.555336, -49.026279, 6),
        (25.680336, 53.572913, 6),
        (32.180336, 53.572913, 6),
    ]]
    fillet(f19_edges, radius=F19_R)

    # F21
    with Locations(Plane.XY.offset(5)):
        with Locations((-30.6616424127, 26.9616968793), (38.680335633, 13.0729128115), (-7.9352072937, -40.0825872694)):
            CounterBoreHole(F21_D / 2, F21_CBORE_D / 2, F21_CBORE_DEPTH, depth=F21_DEPTH)
            with Locations((0, 0, -(F21_DEPTH + F21_TIP / 2))):  # 118° drill point
                Cone(0, F21_D / 2, F21_TIP, mode=Mode.SUBTRACT)


solid = f1.part
